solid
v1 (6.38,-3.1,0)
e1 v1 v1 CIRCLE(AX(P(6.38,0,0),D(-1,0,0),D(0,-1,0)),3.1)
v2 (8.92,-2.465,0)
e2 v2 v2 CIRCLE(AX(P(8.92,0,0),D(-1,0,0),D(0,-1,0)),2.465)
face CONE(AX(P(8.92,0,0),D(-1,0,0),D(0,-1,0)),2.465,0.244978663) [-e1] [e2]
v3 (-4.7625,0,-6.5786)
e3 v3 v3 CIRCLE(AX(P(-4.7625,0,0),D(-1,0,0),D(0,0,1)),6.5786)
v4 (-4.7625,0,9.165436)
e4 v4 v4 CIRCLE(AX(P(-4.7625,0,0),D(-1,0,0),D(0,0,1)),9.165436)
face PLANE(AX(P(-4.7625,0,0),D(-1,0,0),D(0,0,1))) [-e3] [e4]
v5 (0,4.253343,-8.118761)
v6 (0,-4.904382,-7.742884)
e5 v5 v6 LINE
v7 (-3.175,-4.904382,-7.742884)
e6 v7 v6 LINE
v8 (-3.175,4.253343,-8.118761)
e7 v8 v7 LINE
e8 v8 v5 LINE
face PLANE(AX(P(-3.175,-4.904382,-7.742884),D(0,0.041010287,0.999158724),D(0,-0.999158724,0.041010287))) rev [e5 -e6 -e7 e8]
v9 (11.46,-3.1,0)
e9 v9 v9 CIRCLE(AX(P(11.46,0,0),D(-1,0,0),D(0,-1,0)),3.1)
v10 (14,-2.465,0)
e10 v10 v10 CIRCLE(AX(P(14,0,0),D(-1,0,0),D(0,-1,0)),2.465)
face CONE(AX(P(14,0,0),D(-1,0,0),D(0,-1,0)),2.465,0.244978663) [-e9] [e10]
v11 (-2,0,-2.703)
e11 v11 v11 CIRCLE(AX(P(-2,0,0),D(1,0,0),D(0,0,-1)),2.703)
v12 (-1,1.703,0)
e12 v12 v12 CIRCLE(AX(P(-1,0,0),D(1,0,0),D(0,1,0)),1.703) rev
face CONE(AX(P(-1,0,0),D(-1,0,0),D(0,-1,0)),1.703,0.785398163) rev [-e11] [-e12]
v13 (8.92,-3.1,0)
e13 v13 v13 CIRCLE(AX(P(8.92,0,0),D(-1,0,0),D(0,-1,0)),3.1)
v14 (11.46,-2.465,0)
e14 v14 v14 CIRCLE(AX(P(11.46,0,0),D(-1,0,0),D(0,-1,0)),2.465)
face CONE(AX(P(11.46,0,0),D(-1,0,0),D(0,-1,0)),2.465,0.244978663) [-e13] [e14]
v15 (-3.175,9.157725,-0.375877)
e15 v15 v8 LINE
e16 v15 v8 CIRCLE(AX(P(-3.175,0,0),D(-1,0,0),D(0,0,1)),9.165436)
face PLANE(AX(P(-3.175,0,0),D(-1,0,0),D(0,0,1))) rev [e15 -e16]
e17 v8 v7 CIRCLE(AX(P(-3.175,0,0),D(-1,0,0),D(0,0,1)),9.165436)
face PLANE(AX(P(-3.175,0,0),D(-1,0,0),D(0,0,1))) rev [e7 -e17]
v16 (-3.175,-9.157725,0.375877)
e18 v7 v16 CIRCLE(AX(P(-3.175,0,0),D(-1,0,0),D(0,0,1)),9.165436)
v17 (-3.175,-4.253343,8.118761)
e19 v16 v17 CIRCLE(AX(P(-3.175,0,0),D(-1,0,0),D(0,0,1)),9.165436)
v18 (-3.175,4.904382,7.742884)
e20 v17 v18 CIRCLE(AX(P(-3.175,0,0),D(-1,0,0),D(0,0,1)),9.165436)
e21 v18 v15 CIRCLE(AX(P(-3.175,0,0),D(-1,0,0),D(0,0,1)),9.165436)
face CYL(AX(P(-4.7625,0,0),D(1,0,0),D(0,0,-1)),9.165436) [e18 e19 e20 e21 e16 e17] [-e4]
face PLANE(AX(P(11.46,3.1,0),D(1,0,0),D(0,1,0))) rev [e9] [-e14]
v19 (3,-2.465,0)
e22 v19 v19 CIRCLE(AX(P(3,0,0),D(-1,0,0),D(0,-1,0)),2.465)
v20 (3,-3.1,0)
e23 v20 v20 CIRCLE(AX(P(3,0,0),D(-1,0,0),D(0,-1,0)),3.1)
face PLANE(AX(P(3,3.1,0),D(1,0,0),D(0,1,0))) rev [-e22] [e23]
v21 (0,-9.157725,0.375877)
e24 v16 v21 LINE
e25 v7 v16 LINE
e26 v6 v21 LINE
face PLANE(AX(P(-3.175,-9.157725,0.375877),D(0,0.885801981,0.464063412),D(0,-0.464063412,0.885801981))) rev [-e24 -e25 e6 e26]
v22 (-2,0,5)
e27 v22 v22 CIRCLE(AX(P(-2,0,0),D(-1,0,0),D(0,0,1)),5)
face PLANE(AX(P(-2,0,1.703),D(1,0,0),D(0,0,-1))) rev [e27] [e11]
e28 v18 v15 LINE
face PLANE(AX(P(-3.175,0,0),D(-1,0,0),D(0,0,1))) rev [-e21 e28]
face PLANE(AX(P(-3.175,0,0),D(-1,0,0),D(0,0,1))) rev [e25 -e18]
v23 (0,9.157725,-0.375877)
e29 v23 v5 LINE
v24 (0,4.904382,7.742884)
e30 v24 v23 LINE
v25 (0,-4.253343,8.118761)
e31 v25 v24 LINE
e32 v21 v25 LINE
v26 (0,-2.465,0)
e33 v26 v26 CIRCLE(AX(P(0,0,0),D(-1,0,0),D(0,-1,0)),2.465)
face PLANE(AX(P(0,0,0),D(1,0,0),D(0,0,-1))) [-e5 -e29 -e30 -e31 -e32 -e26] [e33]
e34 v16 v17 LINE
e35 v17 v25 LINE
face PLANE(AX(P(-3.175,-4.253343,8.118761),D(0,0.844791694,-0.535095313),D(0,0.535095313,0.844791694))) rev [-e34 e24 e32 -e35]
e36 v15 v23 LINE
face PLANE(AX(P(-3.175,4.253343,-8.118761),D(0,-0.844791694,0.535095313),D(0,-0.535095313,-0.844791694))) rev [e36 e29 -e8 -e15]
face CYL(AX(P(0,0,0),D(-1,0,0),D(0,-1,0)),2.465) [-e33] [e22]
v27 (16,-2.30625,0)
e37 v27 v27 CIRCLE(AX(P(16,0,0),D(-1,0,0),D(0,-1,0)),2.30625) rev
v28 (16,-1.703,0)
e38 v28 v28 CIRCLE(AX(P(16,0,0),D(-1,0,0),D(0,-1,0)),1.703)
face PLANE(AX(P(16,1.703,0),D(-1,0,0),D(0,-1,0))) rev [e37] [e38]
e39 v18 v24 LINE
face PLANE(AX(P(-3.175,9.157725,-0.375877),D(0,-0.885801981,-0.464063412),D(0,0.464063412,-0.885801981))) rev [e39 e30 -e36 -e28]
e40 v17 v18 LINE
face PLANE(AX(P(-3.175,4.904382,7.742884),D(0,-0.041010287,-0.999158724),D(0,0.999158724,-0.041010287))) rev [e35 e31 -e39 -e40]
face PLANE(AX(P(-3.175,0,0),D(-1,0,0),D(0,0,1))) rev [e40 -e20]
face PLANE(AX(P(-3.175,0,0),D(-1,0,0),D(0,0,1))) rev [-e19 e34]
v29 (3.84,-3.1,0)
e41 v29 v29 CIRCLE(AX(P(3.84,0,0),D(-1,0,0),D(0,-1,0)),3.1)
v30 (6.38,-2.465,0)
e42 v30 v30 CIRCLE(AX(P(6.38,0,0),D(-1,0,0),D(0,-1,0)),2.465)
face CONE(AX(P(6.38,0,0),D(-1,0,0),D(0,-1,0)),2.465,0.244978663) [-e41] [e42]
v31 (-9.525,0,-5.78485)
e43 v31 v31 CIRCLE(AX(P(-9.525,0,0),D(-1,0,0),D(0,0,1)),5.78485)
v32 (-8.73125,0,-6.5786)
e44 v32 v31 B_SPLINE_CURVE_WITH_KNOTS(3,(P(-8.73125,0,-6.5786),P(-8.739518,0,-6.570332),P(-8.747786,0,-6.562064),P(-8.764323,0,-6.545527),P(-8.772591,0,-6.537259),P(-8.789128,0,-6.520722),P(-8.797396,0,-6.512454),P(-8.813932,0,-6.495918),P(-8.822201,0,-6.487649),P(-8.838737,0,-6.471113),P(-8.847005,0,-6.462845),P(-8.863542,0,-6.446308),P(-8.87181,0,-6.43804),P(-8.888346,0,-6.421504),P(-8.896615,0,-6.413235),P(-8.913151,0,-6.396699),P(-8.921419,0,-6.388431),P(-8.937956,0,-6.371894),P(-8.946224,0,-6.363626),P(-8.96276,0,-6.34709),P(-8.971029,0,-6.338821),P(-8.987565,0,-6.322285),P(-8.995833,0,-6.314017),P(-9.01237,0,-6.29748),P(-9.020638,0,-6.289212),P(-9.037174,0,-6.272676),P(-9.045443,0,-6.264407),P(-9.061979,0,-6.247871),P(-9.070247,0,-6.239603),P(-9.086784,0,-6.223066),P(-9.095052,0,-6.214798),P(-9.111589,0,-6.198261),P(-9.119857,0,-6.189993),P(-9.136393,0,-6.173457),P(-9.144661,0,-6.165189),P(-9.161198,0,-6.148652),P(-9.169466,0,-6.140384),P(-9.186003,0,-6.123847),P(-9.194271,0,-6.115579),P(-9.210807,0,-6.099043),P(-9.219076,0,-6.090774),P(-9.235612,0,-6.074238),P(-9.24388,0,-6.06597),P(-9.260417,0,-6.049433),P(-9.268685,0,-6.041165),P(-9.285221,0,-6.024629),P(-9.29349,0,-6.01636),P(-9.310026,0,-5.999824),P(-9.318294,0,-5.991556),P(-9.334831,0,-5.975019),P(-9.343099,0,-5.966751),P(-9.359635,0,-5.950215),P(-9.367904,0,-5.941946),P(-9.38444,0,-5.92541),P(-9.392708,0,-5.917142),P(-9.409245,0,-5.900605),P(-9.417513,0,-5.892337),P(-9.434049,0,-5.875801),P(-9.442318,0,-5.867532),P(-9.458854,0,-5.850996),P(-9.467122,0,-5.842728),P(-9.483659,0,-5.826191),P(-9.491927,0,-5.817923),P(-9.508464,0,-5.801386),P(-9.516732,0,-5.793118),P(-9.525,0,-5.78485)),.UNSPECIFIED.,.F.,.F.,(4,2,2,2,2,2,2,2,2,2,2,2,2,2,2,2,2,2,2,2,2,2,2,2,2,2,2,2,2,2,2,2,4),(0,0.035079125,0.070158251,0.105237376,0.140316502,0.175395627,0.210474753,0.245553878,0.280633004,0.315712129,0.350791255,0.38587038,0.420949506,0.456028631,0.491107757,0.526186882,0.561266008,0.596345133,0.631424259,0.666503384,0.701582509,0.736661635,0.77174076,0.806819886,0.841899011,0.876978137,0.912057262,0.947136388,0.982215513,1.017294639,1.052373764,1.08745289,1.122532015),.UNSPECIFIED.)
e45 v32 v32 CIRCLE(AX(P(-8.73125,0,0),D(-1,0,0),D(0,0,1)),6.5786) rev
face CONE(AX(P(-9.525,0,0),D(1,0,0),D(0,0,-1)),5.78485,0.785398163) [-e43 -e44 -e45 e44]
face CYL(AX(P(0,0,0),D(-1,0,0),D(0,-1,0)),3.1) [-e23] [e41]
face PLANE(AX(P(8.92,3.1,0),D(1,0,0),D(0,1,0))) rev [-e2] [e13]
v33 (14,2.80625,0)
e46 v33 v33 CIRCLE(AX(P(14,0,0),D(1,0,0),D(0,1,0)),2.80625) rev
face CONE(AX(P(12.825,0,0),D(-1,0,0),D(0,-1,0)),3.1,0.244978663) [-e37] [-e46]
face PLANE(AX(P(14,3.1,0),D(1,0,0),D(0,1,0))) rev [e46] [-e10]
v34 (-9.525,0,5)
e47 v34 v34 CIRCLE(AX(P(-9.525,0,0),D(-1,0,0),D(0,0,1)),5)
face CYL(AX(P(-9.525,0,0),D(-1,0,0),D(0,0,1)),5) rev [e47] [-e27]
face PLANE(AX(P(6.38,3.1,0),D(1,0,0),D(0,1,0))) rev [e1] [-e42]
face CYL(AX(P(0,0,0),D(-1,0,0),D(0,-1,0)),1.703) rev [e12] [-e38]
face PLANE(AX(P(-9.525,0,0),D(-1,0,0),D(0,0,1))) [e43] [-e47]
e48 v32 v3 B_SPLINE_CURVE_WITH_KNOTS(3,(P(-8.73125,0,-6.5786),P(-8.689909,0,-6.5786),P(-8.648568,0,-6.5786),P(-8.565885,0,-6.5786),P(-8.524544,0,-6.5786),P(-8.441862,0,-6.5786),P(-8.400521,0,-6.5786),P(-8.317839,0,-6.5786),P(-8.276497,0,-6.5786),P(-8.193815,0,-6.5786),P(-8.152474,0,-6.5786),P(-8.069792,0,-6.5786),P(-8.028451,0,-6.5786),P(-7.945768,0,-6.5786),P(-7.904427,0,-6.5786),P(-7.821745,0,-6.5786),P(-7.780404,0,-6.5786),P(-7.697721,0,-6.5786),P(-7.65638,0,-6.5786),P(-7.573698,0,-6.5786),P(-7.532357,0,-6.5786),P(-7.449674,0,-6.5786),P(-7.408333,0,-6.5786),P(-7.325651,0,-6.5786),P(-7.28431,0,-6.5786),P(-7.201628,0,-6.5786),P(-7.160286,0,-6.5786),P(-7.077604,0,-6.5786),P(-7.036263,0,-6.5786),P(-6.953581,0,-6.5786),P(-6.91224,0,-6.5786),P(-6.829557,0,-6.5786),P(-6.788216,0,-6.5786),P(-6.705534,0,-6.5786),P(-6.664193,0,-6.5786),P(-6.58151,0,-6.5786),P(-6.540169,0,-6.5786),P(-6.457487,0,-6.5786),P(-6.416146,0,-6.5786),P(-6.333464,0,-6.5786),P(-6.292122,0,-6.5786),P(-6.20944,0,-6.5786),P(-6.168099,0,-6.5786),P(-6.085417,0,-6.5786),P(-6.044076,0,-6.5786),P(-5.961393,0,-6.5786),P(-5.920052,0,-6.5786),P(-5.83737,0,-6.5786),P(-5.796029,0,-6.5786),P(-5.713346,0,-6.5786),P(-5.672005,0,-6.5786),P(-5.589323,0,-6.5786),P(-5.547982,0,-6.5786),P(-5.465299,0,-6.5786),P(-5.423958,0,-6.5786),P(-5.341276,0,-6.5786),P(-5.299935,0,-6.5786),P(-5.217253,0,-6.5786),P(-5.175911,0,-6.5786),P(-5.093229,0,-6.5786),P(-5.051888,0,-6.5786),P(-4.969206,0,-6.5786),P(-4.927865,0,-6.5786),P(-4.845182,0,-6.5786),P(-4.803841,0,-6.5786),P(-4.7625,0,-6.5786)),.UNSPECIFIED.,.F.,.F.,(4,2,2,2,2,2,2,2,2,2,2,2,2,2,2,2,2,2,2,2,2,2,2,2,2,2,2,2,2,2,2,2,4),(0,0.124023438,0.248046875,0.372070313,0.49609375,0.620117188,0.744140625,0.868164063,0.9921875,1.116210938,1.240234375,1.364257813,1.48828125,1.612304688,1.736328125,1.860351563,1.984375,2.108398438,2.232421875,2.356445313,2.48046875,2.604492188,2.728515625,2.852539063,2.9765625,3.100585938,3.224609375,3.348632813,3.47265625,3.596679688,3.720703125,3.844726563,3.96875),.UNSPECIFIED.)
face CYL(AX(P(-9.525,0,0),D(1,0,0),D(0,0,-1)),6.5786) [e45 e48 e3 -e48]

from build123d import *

# Parameters (mm, degrees)
CHAMFER1_SIZE    = 0.79375
CHAMFER1_SIZE_2  = 3.175
EXTRUSION1_DEPTH = 3.175
ESQUISSE3_R      = 9.165435523
EXTRUSION2_DEPTH = 1.5875
ESQUISSE4_R      = 6.5786
THREAD1_DEPTH    = 4.7625
CHAMFER2_SIZE    = 0.79375
CHAMFER4_SIZE    = 1


with BuildPart() as part:
    # Esquisse1 → Revolution1 (revolve)
    with BuildSketch(Plane.XY, mode=Mode.PRIVATE) as revolution1_sk:
        Polygon((0, 1.703), (16, 1.703), (16, 3.1), (14, 3.1), (14, 2.465), (11.46, 3.1), (11.46, 2.465), (8.92, 3.1), (8.92, 2.465), (6.38, 3.1), (6.38, 2.465), (3.84, 3.1), (3, 3.1), (3, 2.465), (0, 2.465), align=None)
    revolve(revolution1_sk.sketch.rotate(Axis((0, 0, 0), (1, 0, 0)), 180), axis=Axis((0, 0, 0), (1, 0, 0)))

    # Chamfer1
    # the kernel refuses this chamfer: 3.175, 0.79375 mm, written as the material it takes off along each edge
    with BuildSketch(Plane(origin=(16, 0, 0), x_dir=(0, -1, 0), z_dir=(0, 0, 1))) as chamfer1_piece_1:
        Polygon((3.1 - CHAMFER1_SIZE, 0), (3.1, -CHAMFER1_SIZE_2), (3.1, 0), align=None)
    revolve(axis=Axis((16, 0, 0), (1, 0, 0)), mode=Mode.SUBTRACT)

    # Esquisse2 → Extrusion1 (add)
    with BuildSketch(Plane.ZY):
        Polygon((0.375877143, -9.157724865), (-7.742883803, -4.904381587), (-8.118760946, 4.253343278), (-0.375877143, 9.157724865), (7.742883803, 4.904381587), (8.118760946, -4.253343278), align=None)
    extrude(amount=EXTRUSION1_DEPTH)

    # Esquisse3 → Extrusion2 (add)
    with BuildSketch(Plane.ZY.offset(3.175)):
        with Locations(Location((0, 0, 0), (0, 0, 152.350375514))):
            Circle(ESQUISSE3_R)
    extrude(amount=EXTRUSION2_DEPTH)

    # Esquisse4 → Thread1 (add)
    with BuildSketch(Plane.ZY.offset(4.7625)):
        with Locations(Location((0, 0, 0), (0, 0, 180))):
            Circle(ESQUISSE4_R)
    extrude(amount=THREAD1_DEPTH)

    # Chamfer2
    chamfer2_edges = [part.edges().sort_by_distance(p)[0] for p in [
        (-9.525, 0, 6.5786),
    ]]
    chamfer(chamfer2_edges, length=CHAMFER2_SIZE)

    # Sketch1 → Cut-Revolve1 (revolve, cut)
    with BuildSketch(Plane(origin=(0, 0, 0), x_dir=(1, 0, 0), z_dir=(0, 1, 0)), mode=Mode.PRIVATE) as cut_revolve1_sk:
        Polygon((0, -1.703), (-2, -1.703), (-2, -5), (-9.525, -5), (-9.525, 0), (0, 0), align=None)
    revolve(cut_revolve1_sk.sketch.rotate(Axis((-9.525, 0, 0), (1, 0, 0)), 90), axis=Axis((-9.525, 0, 0), (1, 0, 0)), mode=Mode.SUBTRACT)

    # Chamfer4
    chamfer4_edges = [part.edges().sort_by_distance(p)[0] for p in [
        (-2, 1.703, 0),
    ]]
    chamfer(chamfer4_edges, length=CHAMFER4_SIZE)


solid = part.part
